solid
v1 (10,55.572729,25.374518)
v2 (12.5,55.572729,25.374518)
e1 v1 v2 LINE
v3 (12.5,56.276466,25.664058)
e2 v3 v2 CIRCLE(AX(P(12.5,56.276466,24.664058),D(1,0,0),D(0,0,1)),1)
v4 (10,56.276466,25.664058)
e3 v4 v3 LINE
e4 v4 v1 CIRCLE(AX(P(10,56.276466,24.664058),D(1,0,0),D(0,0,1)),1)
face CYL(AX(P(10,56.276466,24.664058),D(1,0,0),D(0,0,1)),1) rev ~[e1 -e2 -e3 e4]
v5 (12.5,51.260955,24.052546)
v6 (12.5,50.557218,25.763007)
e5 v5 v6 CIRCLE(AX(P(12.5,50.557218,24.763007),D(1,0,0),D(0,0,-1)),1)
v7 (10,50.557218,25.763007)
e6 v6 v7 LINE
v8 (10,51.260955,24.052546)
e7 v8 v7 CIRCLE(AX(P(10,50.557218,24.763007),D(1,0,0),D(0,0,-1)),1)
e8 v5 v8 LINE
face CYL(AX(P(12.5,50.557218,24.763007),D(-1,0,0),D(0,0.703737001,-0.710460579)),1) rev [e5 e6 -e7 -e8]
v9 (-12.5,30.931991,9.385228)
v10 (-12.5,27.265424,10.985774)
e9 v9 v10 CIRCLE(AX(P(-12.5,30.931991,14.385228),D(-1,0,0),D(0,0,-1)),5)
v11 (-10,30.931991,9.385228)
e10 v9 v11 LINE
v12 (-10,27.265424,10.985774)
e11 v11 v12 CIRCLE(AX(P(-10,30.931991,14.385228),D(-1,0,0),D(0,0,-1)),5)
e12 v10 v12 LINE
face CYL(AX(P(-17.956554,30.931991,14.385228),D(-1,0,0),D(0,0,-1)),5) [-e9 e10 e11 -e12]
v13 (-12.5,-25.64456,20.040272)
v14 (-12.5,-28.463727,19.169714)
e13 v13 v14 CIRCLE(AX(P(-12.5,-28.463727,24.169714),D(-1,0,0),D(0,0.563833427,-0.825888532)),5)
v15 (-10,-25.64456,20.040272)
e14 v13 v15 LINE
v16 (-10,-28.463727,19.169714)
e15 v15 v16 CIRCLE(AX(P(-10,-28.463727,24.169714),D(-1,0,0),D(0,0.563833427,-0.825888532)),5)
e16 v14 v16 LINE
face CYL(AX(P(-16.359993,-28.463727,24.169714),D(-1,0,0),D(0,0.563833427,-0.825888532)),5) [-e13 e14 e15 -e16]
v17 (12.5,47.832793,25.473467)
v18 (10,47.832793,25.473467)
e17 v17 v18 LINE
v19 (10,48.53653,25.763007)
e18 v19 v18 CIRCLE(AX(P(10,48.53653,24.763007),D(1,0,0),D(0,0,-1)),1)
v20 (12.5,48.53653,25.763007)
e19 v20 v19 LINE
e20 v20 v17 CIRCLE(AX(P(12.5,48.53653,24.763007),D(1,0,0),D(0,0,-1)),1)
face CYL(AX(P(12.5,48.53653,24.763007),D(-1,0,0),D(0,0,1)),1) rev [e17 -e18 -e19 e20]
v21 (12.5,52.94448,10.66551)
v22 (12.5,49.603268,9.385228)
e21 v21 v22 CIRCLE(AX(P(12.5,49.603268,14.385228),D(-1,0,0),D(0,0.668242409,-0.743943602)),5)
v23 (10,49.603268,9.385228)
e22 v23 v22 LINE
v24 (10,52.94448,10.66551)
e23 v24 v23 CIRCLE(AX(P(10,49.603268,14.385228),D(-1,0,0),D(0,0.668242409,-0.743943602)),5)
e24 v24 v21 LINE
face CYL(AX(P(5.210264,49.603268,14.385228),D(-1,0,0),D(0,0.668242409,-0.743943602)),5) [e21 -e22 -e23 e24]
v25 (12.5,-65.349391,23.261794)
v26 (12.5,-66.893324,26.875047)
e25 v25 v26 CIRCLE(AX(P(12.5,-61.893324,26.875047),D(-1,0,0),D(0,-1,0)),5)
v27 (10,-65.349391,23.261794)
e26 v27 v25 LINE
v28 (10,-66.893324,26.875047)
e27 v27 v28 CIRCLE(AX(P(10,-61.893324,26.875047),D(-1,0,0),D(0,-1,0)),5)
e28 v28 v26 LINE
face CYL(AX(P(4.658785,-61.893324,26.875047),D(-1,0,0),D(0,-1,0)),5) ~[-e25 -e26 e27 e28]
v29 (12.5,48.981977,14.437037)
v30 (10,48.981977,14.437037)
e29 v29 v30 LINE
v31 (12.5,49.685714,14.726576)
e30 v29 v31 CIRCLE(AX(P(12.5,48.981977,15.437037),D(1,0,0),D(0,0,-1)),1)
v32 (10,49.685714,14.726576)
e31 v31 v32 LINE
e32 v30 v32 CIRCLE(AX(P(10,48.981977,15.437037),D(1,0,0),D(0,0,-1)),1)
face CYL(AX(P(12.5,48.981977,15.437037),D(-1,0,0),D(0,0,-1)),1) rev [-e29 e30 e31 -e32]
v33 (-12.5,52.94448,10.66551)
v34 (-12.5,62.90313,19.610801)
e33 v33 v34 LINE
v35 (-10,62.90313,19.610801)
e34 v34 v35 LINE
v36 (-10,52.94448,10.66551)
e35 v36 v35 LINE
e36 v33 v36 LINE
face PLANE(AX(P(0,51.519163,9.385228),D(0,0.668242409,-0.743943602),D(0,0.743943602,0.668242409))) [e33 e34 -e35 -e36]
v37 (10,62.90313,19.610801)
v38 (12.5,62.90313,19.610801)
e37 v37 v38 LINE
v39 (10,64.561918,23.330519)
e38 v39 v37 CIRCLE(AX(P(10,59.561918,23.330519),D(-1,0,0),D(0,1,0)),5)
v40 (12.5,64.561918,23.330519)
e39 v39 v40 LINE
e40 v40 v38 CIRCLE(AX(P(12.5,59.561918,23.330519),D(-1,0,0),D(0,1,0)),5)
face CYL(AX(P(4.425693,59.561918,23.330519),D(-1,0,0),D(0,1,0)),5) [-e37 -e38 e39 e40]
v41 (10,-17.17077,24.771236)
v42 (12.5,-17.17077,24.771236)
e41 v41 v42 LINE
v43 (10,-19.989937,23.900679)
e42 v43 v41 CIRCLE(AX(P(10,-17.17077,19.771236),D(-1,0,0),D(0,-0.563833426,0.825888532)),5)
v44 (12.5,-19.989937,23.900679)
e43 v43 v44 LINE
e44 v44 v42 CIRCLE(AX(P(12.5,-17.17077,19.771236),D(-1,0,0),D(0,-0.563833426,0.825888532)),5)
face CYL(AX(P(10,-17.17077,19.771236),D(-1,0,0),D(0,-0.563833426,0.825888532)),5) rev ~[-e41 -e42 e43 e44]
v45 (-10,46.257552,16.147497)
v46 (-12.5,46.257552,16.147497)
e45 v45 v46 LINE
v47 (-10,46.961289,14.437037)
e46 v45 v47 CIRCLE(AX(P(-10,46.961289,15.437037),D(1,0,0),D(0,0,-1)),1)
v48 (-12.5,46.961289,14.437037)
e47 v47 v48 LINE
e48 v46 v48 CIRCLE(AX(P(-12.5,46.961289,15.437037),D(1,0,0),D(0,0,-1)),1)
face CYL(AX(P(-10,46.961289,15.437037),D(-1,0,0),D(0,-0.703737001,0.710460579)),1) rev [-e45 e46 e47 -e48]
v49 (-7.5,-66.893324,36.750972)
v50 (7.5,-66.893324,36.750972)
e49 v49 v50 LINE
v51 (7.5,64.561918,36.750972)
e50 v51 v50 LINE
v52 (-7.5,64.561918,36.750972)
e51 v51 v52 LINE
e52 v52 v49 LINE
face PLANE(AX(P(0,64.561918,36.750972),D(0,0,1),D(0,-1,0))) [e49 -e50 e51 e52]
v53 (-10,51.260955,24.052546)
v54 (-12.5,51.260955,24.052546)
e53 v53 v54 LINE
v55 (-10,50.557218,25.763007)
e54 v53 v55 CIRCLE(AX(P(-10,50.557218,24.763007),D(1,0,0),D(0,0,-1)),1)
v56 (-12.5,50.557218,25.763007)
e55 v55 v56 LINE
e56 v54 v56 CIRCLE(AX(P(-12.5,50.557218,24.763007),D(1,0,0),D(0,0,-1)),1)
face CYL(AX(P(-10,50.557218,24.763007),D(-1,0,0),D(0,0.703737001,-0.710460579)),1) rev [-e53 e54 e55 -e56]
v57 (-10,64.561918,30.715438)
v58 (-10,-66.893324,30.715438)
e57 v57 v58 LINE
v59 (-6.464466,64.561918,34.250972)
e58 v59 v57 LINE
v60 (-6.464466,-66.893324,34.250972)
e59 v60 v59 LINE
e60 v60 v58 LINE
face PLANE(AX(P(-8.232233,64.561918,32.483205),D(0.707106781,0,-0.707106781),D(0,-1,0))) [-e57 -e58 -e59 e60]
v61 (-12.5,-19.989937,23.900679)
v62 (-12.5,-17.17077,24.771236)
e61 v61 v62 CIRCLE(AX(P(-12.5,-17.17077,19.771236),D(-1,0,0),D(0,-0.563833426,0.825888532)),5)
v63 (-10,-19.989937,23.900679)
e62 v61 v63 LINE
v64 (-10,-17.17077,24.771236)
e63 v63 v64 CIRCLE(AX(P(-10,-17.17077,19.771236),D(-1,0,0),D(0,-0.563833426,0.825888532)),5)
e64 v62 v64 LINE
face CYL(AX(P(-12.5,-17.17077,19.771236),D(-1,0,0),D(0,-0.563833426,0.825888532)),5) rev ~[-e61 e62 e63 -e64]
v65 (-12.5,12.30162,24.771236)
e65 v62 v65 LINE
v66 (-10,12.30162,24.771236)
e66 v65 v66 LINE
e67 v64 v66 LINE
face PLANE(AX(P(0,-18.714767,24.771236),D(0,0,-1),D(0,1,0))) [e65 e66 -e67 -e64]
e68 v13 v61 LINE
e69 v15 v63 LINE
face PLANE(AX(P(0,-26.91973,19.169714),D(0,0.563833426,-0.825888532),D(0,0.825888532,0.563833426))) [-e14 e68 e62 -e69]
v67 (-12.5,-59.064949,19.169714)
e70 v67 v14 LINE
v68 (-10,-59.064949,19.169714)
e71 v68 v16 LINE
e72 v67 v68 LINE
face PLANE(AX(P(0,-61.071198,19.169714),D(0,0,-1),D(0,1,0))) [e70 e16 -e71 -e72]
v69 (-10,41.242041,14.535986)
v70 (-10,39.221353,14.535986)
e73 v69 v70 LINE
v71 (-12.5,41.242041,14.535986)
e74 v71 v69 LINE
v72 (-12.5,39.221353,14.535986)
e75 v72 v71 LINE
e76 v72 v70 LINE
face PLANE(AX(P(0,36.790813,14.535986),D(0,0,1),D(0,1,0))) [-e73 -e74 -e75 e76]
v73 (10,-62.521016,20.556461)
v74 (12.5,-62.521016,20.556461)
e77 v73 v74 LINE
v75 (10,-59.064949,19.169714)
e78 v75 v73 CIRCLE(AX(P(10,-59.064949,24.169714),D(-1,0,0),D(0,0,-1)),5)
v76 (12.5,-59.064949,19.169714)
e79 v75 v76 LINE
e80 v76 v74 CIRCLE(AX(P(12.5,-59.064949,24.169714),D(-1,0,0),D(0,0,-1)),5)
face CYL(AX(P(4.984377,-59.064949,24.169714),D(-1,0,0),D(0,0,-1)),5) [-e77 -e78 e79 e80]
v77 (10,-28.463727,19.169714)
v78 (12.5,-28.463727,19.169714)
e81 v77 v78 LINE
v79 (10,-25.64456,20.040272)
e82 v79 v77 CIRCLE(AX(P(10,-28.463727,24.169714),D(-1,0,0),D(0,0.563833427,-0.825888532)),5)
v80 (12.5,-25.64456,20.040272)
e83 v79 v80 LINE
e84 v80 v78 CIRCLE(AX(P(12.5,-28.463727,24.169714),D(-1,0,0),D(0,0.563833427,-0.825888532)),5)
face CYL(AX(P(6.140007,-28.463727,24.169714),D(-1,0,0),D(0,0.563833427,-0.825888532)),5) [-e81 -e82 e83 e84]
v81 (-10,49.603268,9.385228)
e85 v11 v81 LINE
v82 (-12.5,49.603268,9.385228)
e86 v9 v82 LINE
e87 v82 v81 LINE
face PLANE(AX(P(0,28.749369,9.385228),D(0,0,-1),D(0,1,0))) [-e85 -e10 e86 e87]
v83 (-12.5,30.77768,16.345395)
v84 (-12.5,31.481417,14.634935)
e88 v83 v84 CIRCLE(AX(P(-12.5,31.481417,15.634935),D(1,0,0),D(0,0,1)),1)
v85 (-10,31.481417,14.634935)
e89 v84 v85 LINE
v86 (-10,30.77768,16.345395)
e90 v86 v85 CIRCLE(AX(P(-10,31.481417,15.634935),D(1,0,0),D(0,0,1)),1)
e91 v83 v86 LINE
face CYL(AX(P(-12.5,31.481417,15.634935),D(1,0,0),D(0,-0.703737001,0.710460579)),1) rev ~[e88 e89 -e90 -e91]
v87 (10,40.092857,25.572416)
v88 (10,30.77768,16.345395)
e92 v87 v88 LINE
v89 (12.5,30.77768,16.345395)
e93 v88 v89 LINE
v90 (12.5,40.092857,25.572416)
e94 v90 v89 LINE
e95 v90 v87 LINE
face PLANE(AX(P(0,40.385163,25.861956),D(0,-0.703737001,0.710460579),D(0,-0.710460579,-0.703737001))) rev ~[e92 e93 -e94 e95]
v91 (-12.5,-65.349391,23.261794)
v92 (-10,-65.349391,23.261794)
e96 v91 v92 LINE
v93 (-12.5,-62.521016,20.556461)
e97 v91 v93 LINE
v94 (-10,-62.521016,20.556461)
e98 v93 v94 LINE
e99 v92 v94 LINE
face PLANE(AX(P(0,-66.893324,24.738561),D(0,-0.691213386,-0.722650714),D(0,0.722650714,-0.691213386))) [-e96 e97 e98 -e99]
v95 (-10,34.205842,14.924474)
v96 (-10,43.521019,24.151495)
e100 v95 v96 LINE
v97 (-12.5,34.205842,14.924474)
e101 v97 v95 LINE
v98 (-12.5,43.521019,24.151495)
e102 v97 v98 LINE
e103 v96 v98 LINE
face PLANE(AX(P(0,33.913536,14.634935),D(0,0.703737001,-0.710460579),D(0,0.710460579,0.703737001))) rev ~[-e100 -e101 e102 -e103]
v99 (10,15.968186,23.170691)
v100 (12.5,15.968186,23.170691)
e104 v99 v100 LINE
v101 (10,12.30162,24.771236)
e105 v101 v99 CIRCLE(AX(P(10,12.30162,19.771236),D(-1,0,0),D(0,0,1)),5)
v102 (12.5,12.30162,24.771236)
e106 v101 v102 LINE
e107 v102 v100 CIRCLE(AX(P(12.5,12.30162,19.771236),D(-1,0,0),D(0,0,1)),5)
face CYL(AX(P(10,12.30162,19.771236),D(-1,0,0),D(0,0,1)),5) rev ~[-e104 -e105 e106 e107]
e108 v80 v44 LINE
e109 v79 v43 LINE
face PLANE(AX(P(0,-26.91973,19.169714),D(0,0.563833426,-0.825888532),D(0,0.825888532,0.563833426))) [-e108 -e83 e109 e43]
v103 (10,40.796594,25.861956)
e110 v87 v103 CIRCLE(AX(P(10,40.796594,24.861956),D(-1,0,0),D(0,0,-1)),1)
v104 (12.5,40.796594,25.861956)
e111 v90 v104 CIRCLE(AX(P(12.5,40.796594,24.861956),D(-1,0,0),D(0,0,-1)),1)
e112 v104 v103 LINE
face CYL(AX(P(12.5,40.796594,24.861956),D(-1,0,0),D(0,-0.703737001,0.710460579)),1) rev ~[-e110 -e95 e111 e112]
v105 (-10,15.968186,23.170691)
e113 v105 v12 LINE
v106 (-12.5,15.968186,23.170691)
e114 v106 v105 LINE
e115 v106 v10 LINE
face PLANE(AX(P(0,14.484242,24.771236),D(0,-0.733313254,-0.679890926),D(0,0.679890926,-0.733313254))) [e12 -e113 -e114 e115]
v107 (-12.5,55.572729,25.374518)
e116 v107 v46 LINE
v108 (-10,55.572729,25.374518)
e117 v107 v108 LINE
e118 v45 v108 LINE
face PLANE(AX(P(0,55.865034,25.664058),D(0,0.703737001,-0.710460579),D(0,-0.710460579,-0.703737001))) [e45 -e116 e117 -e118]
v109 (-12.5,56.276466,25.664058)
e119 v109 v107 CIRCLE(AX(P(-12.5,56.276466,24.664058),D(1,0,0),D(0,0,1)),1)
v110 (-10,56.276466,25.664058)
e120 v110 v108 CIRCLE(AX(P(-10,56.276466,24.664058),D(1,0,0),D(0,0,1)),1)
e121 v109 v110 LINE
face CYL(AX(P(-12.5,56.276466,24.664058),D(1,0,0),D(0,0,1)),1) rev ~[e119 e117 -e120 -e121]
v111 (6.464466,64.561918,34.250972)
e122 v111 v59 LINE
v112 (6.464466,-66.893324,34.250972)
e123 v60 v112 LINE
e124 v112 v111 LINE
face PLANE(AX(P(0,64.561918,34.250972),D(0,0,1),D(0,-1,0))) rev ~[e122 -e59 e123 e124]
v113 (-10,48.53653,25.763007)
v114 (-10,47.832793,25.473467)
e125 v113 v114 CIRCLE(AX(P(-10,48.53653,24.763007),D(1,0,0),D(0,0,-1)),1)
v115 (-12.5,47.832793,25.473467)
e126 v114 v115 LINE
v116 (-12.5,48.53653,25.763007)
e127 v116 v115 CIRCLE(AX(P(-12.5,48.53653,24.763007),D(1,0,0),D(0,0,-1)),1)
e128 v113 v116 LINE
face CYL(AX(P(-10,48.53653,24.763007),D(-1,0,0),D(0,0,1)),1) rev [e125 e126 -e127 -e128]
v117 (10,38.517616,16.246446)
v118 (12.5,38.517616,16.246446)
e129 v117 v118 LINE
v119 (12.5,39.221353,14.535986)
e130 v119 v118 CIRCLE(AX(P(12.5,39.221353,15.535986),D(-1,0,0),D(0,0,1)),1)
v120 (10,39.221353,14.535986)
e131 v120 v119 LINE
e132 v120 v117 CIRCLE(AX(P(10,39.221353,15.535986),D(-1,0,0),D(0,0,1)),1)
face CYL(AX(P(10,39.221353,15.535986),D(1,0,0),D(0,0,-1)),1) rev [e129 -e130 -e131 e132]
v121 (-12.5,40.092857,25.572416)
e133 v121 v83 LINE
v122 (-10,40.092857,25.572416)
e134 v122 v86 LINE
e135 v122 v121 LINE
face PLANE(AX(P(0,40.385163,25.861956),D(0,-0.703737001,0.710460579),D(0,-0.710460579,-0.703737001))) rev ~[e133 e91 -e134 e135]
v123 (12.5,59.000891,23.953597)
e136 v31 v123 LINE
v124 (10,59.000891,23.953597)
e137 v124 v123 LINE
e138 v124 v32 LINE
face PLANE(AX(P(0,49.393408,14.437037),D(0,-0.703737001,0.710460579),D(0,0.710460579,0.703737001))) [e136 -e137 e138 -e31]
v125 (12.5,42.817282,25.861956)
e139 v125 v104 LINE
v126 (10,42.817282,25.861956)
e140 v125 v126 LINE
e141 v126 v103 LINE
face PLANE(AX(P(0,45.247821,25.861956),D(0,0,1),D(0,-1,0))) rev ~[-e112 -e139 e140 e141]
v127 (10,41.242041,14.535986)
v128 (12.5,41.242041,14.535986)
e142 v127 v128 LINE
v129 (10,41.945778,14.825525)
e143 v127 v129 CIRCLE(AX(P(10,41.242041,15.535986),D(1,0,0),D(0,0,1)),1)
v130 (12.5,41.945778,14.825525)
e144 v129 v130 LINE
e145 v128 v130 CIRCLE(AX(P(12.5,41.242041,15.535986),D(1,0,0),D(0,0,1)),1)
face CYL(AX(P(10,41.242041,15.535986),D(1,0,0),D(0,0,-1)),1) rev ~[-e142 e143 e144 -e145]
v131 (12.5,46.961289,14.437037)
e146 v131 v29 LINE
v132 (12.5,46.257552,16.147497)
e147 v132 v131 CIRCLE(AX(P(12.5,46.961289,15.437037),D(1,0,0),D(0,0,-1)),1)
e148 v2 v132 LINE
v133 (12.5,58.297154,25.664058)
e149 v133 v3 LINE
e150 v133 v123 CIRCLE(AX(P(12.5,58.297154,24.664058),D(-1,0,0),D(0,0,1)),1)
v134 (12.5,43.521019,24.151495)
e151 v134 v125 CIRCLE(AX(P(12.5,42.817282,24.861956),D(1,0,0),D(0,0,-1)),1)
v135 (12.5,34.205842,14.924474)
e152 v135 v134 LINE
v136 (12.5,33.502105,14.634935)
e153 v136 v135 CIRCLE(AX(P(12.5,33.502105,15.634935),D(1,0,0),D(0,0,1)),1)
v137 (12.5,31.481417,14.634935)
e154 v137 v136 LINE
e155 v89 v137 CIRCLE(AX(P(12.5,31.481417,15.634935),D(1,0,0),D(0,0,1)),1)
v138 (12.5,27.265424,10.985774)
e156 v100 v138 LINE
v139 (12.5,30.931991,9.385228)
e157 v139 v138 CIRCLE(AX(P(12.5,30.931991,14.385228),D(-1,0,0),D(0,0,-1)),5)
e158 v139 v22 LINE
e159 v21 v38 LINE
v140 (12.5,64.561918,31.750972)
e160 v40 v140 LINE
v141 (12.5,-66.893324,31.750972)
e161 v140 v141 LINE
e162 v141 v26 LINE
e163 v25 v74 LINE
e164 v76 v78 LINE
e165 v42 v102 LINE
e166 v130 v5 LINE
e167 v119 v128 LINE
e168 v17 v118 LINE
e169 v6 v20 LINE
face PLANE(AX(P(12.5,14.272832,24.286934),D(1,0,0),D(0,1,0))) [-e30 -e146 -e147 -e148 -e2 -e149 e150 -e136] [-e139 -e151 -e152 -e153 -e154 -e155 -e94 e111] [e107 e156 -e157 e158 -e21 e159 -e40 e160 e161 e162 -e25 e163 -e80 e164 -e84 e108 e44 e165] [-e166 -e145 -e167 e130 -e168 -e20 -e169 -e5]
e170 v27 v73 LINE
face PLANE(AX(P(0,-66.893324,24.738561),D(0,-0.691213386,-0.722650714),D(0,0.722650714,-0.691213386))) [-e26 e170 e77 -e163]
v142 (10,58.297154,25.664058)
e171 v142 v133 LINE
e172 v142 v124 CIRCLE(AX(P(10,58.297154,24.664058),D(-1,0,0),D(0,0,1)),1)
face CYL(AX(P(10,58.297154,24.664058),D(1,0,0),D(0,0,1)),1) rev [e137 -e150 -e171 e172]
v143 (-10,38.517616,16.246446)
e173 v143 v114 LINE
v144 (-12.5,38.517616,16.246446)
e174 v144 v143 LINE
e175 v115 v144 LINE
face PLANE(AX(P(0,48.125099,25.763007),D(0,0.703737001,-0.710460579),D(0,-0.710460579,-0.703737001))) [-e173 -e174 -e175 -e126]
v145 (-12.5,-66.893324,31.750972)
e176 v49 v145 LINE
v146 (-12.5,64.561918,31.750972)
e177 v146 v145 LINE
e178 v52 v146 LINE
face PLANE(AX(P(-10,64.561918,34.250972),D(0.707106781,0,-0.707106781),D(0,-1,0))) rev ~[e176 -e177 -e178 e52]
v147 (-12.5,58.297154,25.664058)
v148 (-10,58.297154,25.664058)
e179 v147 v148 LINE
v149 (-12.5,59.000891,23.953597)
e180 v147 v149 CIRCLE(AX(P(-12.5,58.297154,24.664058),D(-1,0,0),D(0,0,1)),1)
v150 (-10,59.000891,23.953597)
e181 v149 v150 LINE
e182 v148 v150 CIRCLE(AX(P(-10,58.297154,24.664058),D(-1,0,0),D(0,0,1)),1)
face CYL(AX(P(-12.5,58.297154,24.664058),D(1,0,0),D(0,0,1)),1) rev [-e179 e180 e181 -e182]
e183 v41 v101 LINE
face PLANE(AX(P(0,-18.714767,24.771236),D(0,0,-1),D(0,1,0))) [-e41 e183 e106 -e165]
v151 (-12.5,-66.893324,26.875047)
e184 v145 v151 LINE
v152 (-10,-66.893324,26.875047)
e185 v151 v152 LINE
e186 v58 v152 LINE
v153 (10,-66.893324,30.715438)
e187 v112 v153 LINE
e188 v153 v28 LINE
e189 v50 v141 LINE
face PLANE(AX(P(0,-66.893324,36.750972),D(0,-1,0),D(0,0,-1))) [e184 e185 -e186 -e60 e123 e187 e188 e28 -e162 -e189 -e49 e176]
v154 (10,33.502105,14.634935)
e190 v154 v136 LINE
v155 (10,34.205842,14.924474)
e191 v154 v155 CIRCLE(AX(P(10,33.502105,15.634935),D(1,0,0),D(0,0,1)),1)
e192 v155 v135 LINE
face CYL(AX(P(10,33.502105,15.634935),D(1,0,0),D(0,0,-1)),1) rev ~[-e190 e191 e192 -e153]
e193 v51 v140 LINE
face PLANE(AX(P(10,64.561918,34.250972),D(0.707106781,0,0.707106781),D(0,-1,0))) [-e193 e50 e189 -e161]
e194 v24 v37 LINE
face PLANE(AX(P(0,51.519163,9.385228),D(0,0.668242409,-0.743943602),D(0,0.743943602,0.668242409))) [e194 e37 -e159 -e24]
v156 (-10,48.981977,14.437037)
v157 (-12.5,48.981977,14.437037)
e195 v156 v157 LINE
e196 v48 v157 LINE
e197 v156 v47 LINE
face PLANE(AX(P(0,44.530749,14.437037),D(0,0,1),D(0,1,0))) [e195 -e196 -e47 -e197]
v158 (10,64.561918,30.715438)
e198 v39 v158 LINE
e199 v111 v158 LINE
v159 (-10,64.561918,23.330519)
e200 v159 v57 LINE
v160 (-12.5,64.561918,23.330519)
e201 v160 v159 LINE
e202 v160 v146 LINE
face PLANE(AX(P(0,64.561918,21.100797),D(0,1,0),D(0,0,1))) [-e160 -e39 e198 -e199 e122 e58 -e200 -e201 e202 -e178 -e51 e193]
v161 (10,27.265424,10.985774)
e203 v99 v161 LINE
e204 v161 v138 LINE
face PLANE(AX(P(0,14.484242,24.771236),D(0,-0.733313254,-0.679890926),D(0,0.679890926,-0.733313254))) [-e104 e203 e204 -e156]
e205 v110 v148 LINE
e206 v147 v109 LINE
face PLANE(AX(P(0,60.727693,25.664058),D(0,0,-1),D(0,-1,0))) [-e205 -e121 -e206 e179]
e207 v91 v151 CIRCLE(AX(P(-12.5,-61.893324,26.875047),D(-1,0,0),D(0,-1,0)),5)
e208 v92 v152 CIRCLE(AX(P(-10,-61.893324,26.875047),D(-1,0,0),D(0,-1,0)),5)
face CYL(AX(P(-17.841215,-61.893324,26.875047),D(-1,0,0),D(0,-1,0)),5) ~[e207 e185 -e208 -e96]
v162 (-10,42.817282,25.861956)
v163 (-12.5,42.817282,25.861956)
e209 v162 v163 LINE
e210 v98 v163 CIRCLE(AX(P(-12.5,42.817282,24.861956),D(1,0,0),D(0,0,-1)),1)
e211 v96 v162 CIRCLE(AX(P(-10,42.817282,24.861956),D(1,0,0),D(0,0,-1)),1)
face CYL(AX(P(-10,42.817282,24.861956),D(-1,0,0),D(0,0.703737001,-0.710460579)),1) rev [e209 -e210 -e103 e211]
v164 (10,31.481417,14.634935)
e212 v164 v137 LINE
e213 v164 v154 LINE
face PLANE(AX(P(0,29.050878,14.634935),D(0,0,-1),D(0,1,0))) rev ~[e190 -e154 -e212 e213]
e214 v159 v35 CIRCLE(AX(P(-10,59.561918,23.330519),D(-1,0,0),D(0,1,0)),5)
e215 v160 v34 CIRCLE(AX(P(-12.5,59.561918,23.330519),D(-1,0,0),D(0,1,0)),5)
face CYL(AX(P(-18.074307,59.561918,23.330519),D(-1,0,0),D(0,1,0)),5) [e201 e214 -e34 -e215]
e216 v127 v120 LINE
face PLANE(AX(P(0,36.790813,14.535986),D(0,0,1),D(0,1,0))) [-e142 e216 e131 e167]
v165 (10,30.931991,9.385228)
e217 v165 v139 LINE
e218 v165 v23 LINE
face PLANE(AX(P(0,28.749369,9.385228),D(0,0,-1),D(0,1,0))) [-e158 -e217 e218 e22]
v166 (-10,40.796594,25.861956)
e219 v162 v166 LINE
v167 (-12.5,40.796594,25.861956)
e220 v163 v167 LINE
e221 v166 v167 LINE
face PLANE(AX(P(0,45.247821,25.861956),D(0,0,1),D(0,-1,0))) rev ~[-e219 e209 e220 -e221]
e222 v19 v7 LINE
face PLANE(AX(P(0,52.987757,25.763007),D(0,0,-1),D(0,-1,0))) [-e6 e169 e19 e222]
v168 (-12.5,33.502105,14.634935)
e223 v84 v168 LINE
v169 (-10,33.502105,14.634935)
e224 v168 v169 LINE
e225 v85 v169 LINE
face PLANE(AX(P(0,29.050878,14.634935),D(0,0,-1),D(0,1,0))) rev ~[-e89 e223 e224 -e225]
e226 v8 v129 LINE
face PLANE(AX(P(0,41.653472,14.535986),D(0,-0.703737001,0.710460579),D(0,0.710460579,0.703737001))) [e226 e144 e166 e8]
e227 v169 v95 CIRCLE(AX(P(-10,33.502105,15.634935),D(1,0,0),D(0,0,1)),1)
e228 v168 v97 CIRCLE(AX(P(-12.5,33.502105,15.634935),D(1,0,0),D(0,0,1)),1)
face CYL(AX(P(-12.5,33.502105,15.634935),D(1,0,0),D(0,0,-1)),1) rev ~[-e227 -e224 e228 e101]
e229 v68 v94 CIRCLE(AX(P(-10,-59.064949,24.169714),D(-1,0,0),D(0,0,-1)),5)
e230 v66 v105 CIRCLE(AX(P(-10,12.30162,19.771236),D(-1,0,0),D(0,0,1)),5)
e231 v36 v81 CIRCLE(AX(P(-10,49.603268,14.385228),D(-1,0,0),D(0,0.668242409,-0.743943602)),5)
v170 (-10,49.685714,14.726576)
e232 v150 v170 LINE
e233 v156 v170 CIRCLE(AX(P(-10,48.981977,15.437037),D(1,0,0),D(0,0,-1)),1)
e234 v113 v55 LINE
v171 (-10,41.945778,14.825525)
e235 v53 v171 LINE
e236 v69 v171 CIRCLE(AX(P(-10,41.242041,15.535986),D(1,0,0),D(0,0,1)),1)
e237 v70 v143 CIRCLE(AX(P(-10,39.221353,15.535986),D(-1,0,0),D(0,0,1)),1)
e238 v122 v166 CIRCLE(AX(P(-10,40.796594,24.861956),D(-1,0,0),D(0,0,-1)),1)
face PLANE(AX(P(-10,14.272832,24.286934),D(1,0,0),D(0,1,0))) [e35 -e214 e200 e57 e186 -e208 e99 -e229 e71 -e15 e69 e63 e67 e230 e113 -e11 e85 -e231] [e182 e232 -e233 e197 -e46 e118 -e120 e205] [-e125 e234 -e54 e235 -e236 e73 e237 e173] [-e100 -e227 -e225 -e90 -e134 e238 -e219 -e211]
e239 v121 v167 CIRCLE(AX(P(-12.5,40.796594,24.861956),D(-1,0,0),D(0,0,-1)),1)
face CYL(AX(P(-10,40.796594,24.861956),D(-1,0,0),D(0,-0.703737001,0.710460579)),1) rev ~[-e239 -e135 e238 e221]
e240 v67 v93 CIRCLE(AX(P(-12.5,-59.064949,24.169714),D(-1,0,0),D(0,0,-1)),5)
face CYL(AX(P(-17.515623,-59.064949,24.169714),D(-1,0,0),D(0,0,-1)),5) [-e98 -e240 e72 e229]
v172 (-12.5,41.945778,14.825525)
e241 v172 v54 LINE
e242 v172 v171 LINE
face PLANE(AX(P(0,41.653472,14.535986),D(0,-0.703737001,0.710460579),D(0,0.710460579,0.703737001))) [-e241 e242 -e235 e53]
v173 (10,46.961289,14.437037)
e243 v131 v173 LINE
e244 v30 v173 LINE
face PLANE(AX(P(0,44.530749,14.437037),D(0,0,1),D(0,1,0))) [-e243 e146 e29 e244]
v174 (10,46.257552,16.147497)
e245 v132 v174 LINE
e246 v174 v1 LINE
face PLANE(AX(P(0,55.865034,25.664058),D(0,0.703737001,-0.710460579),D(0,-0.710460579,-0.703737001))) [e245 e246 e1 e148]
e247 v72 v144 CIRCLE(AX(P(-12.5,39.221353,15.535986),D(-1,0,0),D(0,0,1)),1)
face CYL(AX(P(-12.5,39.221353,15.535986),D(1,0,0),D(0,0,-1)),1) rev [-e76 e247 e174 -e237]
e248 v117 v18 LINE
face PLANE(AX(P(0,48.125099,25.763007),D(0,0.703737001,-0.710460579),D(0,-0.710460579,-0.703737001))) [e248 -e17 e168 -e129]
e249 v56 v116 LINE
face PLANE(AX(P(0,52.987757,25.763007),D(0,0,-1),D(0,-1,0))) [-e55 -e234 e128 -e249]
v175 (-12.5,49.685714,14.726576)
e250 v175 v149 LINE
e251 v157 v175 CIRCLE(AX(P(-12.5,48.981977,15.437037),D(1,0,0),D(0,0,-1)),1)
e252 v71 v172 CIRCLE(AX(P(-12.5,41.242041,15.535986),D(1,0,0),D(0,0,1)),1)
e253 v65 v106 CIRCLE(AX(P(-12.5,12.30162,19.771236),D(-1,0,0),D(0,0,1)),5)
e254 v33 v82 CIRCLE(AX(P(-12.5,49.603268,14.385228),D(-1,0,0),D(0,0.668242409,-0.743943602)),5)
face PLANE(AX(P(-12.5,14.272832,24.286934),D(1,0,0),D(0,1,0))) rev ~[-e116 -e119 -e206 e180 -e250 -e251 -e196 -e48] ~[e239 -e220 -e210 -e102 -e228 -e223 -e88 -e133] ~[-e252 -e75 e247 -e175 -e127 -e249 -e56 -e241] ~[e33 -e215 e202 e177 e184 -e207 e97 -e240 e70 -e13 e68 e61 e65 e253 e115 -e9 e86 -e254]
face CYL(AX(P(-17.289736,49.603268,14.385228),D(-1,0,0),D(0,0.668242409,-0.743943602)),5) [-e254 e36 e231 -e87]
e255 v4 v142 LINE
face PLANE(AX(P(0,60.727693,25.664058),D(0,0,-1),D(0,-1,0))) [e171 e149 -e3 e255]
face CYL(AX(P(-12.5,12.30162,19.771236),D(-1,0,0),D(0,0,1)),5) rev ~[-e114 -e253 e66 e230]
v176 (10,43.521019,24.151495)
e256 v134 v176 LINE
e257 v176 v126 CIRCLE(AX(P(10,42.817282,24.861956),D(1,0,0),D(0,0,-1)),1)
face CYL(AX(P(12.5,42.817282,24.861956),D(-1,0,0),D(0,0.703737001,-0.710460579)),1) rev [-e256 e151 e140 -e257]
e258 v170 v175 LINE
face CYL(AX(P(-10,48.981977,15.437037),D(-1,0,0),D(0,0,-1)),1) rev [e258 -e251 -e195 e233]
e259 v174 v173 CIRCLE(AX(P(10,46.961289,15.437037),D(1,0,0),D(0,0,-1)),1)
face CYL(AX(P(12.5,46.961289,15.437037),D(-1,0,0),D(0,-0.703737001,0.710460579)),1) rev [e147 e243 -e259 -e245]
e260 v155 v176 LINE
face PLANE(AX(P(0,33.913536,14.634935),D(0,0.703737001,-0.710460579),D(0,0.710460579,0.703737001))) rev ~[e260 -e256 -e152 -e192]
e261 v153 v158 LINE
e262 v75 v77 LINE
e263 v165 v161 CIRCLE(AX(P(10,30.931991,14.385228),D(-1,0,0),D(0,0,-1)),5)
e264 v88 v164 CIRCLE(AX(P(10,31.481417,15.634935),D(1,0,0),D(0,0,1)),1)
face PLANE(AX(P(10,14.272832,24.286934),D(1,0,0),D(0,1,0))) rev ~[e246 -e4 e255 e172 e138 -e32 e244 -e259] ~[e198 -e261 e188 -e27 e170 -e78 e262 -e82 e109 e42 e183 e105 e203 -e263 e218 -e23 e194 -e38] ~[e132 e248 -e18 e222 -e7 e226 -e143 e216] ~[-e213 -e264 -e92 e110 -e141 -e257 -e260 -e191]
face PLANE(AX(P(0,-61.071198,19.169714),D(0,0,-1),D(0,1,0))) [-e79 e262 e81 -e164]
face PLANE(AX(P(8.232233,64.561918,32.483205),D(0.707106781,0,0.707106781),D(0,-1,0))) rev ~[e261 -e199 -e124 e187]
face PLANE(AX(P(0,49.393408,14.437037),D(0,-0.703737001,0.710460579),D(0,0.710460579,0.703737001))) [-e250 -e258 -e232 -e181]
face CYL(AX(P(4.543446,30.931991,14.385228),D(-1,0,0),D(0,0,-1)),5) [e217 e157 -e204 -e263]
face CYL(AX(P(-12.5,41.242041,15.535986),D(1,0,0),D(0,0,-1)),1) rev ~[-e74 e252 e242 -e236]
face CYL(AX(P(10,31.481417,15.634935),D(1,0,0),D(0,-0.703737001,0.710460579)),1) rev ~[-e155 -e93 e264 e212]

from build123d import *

# Parameters (mm, degrees)
F1_DEPTH     = 12.5
F2_SIZE      = 5
F3_T         = -2.5
F4_T1_DEPTH  = 2.5
F4_T3_DEPTH  = 2.5
F4_T5_DEPTH  = 2.5
F4_T7_DEPTH  = 2.5
F4_T9_DEPTH  = 13.1824295502
F4_T11_DEPTH = 13.1824295502
F4_T13_DEPTH = 12.5312469121
F4_T15_DEPTH = 12.5312469121
F4_T17_DEPTH = 10.2199869631
F4_T19_DEPTH = 10.2199869631
F4_T21_DEPTH = 13.4131081399
F4_T23_DEPTH = 13.4131081399
F4_T25_DEPTH = 12.0794727567
F4_T27_DEPTH = 12.0794727567
F4_T29_DEPTH = 13.6486136239
F4_T31_DEPTH = 13.6486136239
F6_DEPTH     = 12.5
F7_R         = 1


# Not quite as in the source:
# - a fillet or chamfer that OpenCascade refuses, or shapes differently, is made with other operations: its cross-section is extruded or revolved along the edge and cut away or added


with BuildPart() as f1:
    # F0 (on Right) → F1 (new body, symmetric)
    with BuildSketch(Plane.YZ):
        Polygon((64.5619183779, 36.750972271), (-66.8933242559, 36.750972271), (-66.8933242559, 24.738561362), (-61.0711984336, 19.1697143018), (-26.9197300076, 19.1697143018), (-18.7147669494, 24.7712358832), (14.4842416048, 24.7712358832), (28.7493690848, 9.385228157), (51.5191629529, 9.385228157), (64.5619183779, 21.1007967591), align=None)
    extrude(amount=F1_DEPTH, both=True)

    # F2
    f2_edges = [f1.edges().sort_by_distance(p)[0] for p in [
        (12.5, -1.165703, 36.750972),
        (-12.5, -1.165703, 36.750972),
    ]]
    chamfer(f2_edges, length=F2_SIZE)

    # F3
    f3_openings = [f1.faces().sort_by_distance(p)[0] for p in [
        (0, -66.893324, 30.350708),
        (0, -63.982261, 21.954138),
        (0, -43.995464, 19.169714),
        (0, -22.817248, 21.970475),
        (0, -2.115263, 24.771236),
        (0, 21.616805, 17.078232),
        (0, 40.134266, 9.385228),
        (0, 58.040541, 15.243012),
        (0, 64.561918, 28.50552),
    ]]
    offset(amount=F3_T, openings=f3_openings)

    # F4: fillet of radius 5 on 22 edges, made by hand

    # F4_s2 → F4_t1 (join)
    with BuildSketch(Plane.YZ.offset(-12.5)):
        with BuildLine():
            ThreePointArc((-19.9899366893, 23.9006785429), (-18.6460299918, 24.5486417325), (-17.1707695568, 24.7712358832))
            Line((-17.1707695568, 24.7712358832), (-18.7147669494, 24.7712358832))
            Line((-18.7147669494, 24.7712358832), (-19.9899366893, 23.9006785429))
        make_face()
    extrude(amount=F4_T1_DEPTH)

    # F4_s4 → F4_t3 (join)
    with BuildSketch(Plane.YZ.offset(10)):
        with BuildLine():
            ThreePointArc((-19.9899366893, 23.9006785429), (-18.6460299918, 24.5486417325), (-17.1707695568, 24.7712358832))
            Line((-17.1707695568, 24.7712358832), (-18.7147669494, 24.7712358832))
            Line((-18.7147669494, 24.7712358832), (-19.9899366893, 23.9006785429))
        make_face()
    extrude(amount=F4_T3_DEPTH)

    # F4_s6 → F4_t5 (join)
    with BuildSketch(Plane.YZ.offset(-12.5)):
        with BuildLine():
            ThreePointArc((12.3016199768, 24.7712358832), (14.3019608026, 24.3536628145), (15.9681862456, 23.1706905155))
            Line((15.9681862456, 23.1706905155), (14.4842416048, 24.7712358832))
            Line((14.4842416048, 24.7712358832), (12.3016199768, 24.7712358832))
        make_face()
    extrude(amount=F4_T5_DEPTH)

    # F4_s8 → F4_t7 (join)
    with BuildSketch(Plane.YZ.offset(10)):
        with BuildLine():
            ThreePointArc((12.3016199768, 24.7712358832), (14.3019608026, 24.3536628145), (15.9681862456, 23.1706905155))
            Line((15.9681862456, 23.1706905155), (14.4842416048, 24.7712358832))
            Line((14.4842416048, 24.7712358832), (12.3016199768, 24.7712358832))
        make_face()
    extrude(amount=F4_T7_DEPTH)

    # F4_s10 → F4_t9 (cut)
    with BuildSketch(Plane.YZ.offset(-17.8412147751)):
        with BuildLine():
            ThreePointArc((-66.8933242559, 26.8750472721), (-66.4911680254, 24.9104015861), (-65.3493911873, 23.2617937014))
            Line((-65.3493911873, 23.2617937014), (-66.8933242559, 24.738561362))
            Line((-66.8933242559, 24.738561362), (-66.8933242559, 26.8750472721))
        make_face()
    extrude(amount=F4_T9_DEPTH, mode=Mode.SUBTRACT)

    # F4_s12 → F4_t11 (cut)
    with BuildSketch(Plane.YZ.offset(4.6587852249)):
        with BuildLine():
            ThreePointArc((-66.8933242559, 26.8750472721), (-66.4911680254, 24.9104015861), (-65.3493911873, 23.2617937014))
            Line((-65.3493911873, 23.2617937014), (-66.8933242559, 24.738561362))
            Line((-66.8933242559, 24.738561362), (-66.8933242559, 26.8750472721))
        make_face()
    extrude(amount=F4_T11_DEPTH, mode=Mode.SUBTRACT)

    # F4_s14 → F4_t13 (cut)
    with BuildSketch(Plane.YZ.offset(-17.5156234561)):
        with BuildLine():
            ThreePointArc((-59.0649490512, 19.1697143018), (-60.9269012722, 19.5293335064), (-62.5210159826, 20.5564607312))
            Line((-62.5210159826, 20.5564607312), (-61.0711984336, 19.1697143018))
            Line((-61.0711984336, 19.1697143018), (-59.0649490512, 19.1697143018))
        make_face()
    extrude(amount=F4_T13_DEPTH, mode=Mode.SUBTRACT)

    # F4_s16 → F4_t15 (cut)
    with BuildSketch(Plane.YZ.offset(4.9843765439)):
        with BuildLine():
            ThreePointArc((-59.0649490512, 19.1697143018), (-60.9269012722, 19.5293335064), (-62.5210159826, 20.5564607312))
            Line((-62.5210159826, 20.5564607312), (-61.0711984336, 19.1697143018))
            Line((-61.0711984336, 19.1697143018), (-59.0649490512, 19.1697143018))
        make_face()
    extrude(amount=F4_T15_DEPTH, mode=Mode.SUBTRACT)

    # F4_s18 → F4_t17 (cut)
    with BuildSketch(Plane.YZ.offset(-16.3599934815)):
        with BuildLine():
            ThreePointArc((-25.6445602678, 20.0402716422), (-26.9884669653, 19.3923084525), (-28.4637274003, 19.1697143018))
            Line((-28.4637274003, 19.1697143018), (-26.9197300076, 19.1697143018))
            Line((-26.9197300076, 19.1697143018), (-25.6445602678, 20.0402716422))
        make_face()
    extrude(amount=F4_T17_DEPTH, mode=Mode.SUBTRACT)

    # F4_s20 → F4_t19 (cut)
    with BuildSketch(Plane.YZ.offset(6.1400065185)):
        with BuildLine():
            ThreePointArc((-25.6445602678, 20.0402716422), (-26.9884669653, 19.3923084525), (-28.4637274003, 19.1697143018))
            Line((-28.4637274003, 19.1697143018), (-26.9197300076, 19.1697143018))
            Line((-26.9197300076, 19.1697143018), (-25.6445602678, 20.0402716422))
        make_face()
    extrude(amount=F4_T19_DEPTH, mode=Mode.SUBTRACT)

    # F4_s22 → F4_t21 (cut)
    with BuildSketch(Plane.YZ.offset(-17.9565540699)):
        with BuildLine():
            ThreePointArc((30.9319907128, 9.385228157), (28.931649887, 9.8028012257), (27.2654244441, 10.9857735247))
            Line((27.2654244441, 10.9857735247), (28.7493690848, 9.385228157))
            Line((28.7493690848, 9.385228157), (30.9319907128, 9.385228157))
        make_face()
    extrude(amount=F4_T21_DEPTH, mode=Mode.SUBTRACT)

    # F4_s24 → F4_t23 (cut)
    with BuildSketch(Plane.YZ.offset(4.5434459301)):
        with BuildLine():
            ThreePointArc((30.9319907128, 9.385228157), (28.931649887, 9.8028012257), (27.2654244441, 10.9857735247))
            Line((27.2654244441, 10.9857735247), (28.7493690848, 9.385228157))
            Line((28.7493690848, 9.385228157), (30.9319907128, 9.385228157))
        make_face()
    extrude(amount=F4_T23_DEPTH, mode=Mode.SUBTRACT)

    # F4_s26 → F4_t25 (cut)
    with BuildSketch(Plane.YZ.offset(-17.2897363783)):
        with BuildLine():
            ThreePointArc((52.9444804464, 10.6655101473), (51.3923198194, 9.7162566403), (49.6032684016, 9.385228157))
            Line((49.6032684016, 9.385228157), (51.5191629529, 9.385228157))
            Line((51.5191629529, 9.385228157), (52.9444804464, 10.6655101473))
        make_face()
    extrude(amount=F4_T25_DEPTH, mode=Mode.SUBTRACT)

    # F4_s28 → F4_t27 (cut)
    with BuildSketch(Plane.YZ.offset(5.2102636217)):
        with BuildLine():
            ThreePointArc((52.9444804464, 10.6655101473), (51.3923198194, 9.7162566403), (49.6032684016, 9.385228157))
            Line((49.6032684016, 9.385228157), (51.5191629529, 9.385228157))
            Line((51.5191629529, 9.385228157), (52.9444804464, 10.6655101473))
        make_face()
    extrude(amount=F4_T27_DEPTH, mode=Mode.SUBTRACT)

    # F4_s30 → F4_t29 (cut)
    with BuildSketch(Plane.YZ.offset(4.425693188)):
        with BuildLine():
            ThreePointArc((64.5619183779, 23.3305194839), (64.128430188, 21.2941084527), (62.9031304227, 19.6108014742))
            Line((62.9031304227, 19.6108014742), (64.5619183779, 21.1007967591))
            Line((64.5619183779, 21.1007967591), (64.5619183779, 23.3305194839))
        make_face()
    extrude(amount=F4_T29_DEPTH, mode=Mode.SUBTRACT)

    # F4_s32 → F4_t31 (cut)
    with BuildSketch(Plane.YZ.offset(-18.074306812)):
        with BuildLine():
            ThreePointArc((64.5619183779, 23.3305194839), (64.128430188, 21.2941084527), (62.9031304227, 19.6108014742))
            Line((62.9031304227, 19.6108014742), (64.5619183779, 21.1007967591))
            Line((64.5619183779, 21.1007967591), (64.5619183779, 23.3305194839))
        make_face()
    extrude(amount=F4_T31_DEPTH, mode=Mode.SUBTRACT)

    # F5 (on Right) → F6 (cut, symmetric)
    with BuildSketch(Plane.YZ):
        Polygon((49.3934080005, 14.4370365888), (60.7276931405, 25.6640575826), (55.865034461, 25.6640575826), (44.530749321, 14.4370365888), align=None)
        Polygon((48.1250985598, 25.7630067087), (36.7908134197, 14.5359857149), (41.6534720992, 14.5359857149), (52.9877572393, 25.7630067087), align=None)
        Polygon((40.3851626585, 25.8619558348), (29.0508775185, 14.6349348409), (33.913536198, 14.6349348409), (45.247821338, 25.8619558348), align=None)
    extrude(amount=F6_DEPTH, both=True, mode=Mode.SUBTRACT)

    # F7
    f7_edges = [f1.edges().sort_by_distance(p)[0] for p in [
        (-11.25, 60.727693, 25.664058),
        (-11.25, 55.865034, 25.664058),
        (-11.25, 44.530749, 14.437037),
        (-11.25, 36.790813, 14.535986),
        (-11.25, 29.050878, 14.634935),
        (-11.25, 49.393408, 14.437037),
        (-11.25, 41.653472, 14.535986),
        (-11.25, 33.913536, 14.634935),
        (-11.25, 52.987757, 25.763007),
        (-11.25, 45.247821, 25.861956),
        (-11.25, 40.385163, 25.861956),
        (-11.25, 48.125099, 25.763007),
        (11.25, 60.727693, 25.664058),
        (11.25, 52.987757, 25.763007),
        (11.25, 45.247821, 25.861956),
        (11.25, 49.393408, 14.437037),
        (11.25, 41.653472, 14.535986),
        (11.25, 33.913536, 14.634935),
        (11.25, 40.385163, 25.861956),
        (11.25, 48.125099, 25.763007),
        (11.25, 55.865034, 25.664058),
        (11.25, 29.050878, 14.634935),
        (11.25, 36.790813, 14.535986),
        (11.25, 44.530749, 14.437037),
    ]]
    fillet(f7_edges, radius=F7_R)


solid = f1.part
